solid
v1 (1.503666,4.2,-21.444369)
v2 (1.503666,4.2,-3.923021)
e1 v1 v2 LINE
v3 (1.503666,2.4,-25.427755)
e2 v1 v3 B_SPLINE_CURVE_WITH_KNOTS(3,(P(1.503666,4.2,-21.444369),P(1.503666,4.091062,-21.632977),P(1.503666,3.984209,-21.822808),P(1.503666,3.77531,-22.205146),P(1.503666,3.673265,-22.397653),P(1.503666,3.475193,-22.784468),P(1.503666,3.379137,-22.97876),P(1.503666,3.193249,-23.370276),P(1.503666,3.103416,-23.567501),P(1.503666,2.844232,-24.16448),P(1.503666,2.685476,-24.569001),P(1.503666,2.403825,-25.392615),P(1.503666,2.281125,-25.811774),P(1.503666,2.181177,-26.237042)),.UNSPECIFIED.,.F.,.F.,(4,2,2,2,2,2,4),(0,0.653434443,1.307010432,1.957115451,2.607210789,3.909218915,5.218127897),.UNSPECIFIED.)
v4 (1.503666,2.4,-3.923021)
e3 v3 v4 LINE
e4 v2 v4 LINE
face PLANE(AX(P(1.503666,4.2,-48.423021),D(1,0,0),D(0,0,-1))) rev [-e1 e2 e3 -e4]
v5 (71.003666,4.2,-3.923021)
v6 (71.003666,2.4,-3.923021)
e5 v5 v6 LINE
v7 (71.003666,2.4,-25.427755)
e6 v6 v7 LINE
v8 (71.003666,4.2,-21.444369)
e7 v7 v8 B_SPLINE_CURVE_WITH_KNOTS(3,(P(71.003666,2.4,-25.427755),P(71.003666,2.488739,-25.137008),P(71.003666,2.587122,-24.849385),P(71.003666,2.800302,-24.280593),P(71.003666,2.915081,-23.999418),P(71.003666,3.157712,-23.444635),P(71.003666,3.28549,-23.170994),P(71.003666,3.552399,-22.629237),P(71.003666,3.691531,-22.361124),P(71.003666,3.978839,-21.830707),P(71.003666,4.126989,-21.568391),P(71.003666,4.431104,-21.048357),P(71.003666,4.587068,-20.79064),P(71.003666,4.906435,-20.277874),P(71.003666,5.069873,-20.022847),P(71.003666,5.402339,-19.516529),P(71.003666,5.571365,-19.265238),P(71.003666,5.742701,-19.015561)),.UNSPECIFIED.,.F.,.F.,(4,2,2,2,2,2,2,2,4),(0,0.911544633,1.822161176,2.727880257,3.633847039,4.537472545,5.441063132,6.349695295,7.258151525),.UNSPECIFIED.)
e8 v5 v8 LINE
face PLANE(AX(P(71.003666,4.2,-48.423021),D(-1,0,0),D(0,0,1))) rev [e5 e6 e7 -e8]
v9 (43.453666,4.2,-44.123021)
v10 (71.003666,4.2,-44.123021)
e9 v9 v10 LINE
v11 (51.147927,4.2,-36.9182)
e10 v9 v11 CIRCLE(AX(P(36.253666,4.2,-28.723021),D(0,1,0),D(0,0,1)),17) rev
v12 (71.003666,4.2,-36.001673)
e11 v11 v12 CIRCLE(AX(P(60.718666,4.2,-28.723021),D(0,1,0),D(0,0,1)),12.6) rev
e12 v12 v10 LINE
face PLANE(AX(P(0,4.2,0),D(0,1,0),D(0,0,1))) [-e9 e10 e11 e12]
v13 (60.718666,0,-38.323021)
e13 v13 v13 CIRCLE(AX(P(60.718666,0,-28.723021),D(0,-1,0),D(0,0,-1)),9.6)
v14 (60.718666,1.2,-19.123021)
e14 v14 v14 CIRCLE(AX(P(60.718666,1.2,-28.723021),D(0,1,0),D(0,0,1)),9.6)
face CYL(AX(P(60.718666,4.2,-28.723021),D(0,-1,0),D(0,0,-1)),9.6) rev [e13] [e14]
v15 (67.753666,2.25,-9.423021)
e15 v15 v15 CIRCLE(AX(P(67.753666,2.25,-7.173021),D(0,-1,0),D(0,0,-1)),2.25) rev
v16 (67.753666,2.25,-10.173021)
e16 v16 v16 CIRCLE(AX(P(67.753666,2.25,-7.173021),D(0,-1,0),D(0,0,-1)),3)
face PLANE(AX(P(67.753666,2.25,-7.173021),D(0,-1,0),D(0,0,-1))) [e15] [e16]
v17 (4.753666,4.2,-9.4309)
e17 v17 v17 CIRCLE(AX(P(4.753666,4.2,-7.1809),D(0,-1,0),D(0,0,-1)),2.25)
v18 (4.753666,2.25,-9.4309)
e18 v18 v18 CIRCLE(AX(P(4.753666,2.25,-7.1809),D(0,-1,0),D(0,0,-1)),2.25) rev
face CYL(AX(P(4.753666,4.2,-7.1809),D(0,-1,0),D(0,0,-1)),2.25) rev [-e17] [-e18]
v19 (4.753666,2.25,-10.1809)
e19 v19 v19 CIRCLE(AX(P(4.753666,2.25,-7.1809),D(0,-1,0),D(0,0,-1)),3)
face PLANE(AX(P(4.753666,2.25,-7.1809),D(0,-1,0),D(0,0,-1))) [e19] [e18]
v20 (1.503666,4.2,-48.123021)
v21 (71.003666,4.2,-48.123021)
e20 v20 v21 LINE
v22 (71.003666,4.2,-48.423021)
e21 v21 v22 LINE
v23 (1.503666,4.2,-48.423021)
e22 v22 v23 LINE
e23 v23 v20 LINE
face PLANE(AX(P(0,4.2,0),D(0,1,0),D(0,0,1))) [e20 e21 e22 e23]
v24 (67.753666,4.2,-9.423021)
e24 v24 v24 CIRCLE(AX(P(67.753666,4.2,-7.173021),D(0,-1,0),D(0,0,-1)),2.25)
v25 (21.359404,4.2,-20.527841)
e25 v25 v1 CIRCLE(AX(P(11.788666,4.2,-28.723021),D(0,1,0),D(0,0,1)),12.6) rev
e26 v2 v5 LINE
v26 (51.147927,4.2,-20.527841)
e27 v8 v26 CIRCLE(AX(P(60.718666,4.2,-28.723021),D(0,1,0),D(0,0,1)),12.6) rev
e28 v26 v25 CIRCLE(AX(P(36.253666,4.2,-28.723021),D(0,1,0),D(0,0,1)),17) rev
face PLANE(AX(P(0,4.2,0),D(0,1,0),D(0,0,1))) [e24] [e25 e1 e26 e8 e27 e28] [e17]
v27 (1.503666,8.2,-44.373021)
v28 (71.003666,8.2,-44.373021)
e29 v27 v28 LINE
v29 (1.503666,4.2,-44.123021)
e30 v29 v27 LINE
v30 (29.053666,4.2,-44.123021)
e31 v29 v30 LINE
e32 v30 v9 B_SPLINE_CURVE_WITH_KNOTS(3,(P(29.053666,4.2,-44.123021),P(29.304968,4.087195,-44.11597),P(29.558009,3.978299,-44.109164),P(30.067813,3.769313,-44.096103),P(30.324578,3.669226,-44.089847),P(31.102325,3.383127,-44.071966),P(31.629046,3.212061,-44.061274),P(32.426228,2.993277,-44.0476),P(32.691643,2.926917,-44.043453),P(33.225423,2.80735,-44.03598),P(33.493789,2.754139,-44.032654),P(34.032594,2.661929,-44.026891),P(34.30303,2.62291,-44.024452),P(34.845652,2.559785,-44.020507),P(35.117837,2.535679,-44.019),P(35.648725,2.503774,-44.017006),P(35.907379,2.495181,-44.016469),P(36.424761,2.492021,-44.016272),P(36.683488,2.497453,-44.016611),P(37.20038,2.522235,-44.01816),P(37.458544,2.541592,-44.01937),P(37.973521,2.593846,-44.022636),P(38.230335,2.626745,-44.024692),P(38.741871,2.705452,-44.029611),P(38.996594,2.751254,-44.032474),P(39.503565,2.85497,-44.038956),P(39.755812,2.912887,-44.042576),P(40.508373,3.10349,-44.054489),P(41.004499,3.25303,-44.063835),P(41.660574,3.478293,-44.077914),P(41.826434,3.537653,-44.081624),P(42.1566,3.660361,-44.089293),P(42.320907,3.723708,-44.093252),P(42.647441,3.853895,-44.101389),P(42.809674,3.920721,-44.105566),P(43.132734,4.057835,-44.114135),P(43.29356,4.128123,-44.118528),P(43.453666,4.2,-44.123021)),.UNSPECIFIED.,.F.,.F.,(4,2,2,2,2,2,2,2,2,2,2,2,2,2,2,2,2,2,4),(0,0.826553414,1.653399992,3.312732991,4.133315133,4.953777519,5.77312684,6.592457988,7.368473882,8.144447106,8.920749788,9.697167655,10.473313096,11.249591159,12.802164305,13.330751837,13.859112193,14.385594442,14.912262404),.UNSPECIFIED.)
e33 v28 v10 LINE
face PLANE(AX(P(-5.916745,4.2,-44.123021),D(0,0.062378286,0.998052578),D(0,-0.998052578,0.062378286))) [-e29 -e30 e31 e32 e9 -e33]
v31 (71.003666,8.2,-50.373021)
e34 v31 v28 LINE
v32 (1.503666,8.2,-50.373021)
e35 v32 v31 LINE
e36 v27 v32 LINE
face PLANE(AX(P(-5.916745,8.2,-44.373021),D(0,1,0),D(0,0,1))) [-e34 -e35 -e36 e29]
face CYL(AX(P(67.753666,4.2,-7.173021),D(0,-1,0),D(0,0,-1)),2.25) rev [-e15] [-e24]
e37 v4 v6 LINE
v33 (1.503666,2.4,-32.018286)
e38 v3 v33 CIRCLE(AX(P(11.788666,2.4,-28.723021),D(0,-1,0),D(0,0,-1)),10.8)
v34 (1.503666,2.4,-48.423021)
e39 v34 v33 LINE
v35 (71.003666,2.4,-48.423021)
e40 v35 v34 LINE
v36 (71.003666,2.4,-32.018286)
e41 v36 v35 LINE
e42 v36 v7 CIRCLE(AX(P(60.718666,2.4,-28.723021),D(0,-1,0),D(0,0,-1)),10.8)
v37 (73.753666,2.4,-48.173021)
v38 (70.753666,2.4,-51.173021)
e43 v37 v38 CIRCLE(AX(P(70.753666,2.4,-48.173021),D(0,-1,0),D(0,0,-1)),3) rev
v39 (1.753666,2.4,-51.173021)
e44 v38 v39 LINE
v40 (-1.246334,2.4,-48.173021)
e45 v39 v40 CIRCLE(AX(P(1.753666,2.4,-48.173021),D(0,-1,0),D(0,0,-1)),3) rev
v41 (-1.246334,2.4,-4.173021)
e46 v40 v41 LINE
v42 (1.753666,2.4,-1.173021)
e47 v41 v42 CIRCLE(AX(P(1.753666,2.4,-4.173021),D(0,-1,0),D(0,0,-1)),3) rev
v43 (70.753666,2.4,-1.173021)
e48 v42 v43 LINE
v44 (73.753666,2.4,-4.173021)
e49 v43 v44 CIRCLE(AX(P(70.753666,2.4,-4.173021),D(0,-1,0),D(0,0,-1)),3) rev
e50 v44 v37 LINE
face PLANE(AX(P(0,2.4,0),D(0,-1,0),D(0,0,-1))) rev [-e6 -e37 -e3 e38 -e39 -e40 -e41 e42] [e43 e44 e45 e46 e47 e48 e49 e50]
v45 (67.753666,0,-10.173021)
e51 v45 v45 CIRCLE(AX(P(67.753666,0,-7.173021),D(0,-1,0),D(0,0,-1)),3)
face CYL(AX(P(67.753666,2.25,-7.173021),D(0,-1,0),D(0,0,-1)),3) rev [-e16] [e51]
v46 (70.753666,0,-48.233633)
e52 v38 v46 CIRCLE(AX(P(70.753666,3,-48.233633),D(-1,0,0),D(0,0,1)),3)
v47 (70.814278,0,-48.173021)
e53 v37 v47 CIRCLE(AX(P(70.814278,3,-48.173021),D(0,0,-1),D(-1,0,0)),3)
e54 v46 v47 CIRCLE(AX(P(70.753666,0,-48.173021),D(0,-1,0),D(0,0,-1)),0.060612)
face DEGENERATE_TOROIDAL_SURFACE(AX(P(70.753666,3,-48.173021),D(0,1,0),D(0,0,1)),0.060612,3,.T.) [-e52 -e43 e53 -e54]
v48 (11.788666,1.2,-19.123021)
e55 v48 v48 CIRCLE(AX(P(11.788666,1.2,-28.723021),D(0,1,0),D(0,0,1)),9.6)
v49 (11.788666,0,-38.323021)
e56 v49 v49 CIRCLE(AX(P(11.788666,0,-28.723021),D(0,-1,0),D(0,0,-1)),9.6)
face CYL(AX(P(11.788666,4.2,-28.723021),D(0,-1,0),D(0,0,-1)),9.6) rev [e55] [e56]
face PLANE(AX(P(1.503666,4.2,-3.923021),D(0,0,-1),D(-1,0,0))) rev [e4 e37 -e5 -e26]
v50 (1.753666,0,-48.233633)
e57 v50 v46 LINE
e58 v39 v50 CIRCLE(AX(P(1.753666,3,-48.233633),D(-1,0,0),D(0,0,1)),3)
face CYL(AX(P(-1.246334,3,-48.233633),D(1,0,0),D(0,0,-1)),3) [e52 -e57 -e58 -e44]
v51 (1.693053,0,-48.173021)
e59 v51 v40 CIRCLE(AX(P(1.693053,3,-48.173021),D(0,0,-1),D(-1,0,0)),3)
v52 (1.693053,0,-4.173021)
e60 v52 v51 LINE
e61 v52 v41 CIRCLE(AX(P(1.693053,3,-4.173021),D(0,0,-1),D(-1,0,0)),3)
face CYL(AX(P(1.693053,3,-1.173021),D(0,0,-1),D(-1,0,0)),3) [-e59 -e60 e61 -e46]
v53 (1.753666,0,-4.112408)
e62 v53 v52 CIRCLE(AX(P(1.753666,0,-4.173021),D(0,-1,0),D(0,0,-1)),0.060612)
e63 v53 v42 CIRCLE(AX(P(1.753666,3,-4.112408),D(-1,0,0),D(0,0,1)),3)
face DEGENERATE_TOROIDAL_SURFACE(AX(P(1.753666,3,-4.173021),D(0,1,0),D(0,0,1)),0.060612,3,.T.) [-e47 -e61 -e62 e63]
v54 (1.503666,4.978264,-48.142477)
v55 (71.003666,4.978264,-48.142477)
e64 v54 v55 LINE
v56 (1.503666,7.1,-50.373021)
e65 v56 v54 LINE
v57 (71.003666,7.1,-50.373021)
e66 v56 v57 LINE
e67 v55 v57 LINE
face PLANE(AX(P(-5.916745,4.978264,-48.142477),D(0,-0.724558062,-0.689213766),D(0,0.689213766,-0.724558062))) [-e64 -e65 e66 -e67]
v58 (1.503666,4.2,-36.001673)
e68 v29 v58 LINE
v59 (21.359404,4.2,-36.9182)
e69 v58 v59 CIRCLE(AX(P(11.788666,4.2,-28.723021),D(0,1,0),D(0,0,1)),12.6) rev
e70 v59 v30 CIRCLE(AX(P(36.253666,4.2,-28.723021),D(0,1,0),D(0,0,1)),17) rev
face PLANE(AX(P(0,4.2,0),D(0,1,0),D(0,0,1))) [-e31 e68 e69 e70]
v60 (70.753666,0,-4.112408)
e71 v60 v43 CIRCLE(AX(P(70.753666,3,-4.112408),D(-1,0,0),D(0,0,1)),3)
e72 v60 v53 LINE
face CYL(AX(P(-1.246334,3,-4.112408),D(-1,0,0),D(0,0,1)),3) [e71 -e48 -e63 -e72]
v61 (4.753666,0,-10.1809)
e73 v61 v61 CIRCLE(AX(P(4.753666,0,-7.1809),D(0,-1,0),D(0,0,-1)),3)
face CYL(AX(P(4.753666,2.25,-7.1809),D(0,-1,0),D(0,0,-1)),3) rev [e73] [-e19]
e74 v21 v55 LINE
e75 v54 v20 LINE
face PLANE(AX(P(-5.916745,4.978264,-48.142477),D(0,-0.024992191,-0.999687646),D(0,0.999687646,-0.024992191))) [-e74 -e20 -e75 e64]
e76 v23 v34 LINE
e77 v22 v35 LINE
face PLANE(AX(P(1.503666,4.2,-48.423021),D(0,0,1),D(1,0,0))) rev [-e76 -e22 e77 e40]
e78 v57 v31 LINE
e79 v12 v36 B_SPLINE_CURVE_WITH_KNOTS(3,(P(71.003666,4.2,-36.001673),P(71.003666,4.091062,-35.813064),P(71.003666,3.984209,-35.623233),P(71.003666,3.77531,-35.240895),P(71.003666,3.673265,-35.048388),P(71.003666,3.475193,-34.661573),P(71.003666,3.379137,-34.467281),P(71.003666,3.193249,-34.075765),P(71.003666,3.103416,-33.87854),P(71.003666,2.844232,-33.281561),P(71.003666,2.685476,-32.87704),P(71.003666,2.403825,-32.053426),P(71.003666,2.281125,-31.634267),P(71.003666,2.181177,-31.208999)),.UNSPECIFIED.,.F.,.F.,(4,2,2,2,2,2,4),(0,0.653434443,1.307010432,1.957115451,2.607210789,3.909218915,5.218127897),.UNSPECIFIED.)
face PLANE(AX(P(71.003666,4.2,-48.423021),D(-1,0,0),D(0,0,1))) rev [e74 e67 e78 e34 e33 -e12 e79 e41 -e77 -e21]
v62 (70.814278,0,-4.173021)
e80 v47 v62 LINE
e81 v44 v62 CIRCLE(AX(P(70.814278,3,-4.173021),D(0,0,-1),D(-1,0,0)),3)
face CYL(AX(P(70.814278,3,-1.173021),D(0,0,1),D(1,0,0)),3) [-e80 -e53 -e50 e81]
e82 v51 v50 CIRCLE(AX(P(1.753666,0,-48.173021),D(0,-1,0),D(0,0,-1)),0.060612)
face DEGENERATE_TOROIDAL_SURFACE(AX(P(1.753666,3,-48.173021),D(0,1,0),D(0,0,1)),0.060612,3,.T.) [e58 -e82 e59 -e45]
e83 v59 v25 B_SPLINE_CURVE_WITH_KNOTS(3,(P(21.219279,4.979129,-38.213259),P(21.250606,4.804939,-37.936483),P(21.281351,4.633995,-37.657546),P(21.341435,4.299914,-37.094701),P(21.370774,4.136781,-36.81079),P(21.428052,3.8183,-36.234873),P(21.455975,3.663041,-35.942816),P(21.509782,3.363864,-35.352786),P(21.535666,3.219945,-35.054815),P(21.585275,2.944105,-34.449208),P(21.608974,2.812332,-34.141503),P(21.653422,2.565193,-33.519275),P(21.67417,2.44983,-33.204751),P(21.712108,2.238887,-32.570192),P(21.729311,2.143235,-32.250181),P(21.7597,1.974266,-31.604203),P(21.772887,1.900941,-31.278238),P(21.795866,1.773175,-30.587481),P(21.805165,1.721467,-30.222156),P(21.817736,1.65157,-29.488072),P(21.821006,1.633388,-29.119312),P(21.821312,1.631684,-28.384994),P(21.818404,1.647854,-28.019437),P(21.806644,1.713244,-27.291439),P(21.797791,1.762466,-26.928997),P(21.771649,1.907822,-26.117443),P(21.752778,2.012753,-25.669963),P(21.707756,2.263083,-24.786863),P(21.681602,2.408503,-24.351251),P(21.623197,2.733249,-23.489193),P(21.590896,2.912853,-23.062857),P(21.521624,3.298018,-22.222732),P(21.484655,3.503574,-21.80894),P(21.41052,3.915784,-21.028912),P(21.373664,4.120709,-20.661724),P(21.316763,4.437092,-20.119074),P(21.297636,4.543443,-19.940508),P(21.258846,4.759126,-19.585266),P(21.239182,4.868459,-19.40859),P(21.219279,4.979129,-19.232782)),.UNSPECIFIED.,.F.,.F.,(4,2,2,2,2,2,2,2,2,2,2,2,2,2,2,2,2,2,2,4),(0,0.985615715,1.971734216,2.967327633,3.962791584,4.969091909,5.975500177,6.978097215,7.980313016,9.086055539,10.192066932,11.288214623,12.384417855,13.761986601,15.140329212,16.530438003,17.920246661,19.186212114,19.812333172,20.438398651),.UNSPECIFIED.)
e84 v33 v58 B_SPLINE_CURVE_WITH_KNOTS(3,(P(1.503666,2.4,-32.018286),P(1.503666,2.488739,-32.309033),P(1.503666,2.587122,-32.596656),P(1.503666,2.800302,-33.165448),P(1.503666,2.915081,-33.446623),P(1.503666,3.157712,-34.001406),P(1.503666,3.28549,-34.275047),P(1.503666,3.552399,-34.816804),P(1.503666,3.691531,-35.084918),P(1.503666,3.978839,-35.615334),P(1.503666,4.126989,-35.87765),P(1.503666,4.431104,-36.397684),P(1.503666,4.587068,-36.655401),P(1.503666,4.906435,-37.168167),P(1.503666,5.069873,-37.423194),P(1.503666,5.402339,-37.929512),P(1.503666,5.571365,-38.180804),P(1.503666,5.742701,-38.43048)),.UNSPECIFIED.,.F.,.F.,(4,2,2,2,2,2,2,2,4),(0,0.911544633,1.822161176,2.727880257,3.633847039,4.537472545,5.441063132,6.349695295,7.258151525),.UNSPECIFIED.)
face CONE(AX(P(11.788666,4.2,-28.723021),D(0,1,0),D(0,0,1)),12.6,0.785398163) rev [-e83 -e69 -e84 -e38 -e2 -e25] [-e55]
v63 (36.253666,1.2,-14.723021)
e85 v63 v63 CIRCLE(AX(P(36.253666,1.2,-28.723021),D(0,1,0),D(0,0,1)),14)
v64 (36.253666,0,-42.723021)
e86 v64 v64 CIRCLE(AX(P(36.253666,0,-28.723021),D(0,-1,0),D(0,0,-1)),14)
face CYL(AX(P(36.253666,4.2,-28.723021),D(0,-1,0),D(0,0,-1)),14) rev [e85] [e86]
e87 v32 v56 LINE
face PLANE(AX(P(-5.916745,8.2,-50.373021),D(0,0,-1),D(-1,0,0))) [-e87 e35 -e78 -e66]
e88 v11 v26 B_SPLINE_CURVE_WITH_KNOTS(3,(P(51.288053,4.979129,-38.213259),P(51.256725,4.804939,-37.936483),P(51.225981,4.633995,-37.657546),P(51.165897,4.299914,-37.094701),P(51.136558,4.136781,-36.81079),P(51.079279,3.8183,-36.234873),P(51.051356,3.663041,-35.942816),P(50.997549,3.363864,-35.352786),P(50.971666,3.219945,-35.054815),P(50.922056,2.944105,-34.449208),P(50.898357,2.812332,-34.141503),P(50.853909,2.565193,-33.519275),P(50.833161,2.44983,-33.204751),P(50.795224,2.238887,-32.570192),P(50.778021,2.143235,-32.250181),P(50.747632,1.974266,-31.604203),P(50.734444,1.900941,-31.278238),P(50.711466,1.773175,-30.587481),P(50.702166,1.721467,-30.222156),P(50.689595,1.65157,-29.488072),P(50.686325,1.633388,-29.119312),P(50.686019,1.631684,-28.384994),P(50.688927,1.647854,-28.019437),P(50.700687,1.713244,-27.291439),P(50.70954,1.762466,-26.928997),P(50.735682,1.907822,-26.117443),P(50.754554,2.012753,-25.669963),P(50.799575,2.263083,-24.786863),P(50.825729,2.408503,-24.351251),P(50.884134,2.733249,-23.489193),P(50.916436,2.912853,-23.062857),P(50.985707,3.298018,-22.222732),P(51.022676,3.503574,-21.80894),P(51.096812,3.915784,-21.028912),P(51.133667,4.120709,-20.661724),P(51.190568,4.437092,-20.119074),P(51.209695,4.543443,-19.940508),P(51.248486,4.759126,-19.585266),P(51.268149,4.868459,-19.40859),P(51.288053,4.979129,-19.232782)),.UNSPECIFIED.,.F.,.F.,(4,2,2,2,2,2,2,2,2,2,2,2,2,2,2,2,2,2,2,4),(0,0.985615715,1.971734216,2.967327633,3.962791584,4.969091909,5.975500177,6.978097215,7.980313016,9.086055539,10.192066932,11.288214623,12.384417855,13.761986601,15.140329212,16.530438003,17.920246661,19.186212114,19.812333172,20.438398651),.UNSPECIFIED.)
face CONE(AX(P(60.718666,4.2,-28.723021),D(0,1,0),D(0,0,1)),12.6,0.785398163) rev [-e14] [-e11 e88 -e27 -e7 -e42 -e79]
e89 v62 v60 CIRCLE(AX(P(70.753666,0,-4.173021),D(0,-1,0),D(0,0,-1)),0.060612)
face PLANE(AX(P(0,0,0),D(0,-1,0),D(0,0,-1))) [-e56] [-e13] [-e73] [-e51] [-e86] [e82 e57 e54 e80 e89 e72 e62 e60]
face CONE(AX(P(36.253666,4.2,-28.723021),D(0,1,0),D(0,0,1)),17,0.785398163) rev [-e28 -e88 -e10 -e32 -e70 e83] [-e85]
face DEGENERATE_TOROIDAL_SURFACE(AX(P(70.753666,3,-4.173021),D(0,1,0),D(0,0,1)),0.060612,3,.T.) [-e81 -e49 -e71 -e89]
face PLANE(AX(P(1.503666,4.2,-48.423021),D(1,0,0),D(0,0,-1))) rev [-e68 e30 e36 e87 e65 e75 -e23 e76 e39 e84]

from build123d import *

# Parameters (mm, degrees)
SKETCH1_W           = 75
SKETCH1_H           = 50
BOSS_EXTRUDE1_DEPTH = 2.4
SKETCH2_W           = 69.5
SKETCH2_H           = 44.5
BOSS_EXTRUDE2_DEPTH = 1.8
SKETCH4_R           = 9.6
SKETCH4_R_2         = 14
SKETCH4_R_3         = 2.25
CUT_EXTRUDE1_DEPTH  = 90.866129507
BOSS_EXTRUDE3_DEPTH = 69.5
FILLET1_R           = 3
FILLET2_R           = 3
SKETCH7_R           = 3
CUT_EXTRUDE3_DEPTH  = 2.25
CHAMFER1_SIZE       = 3


with BuildPart() as part:
    # Sketch1 → Boss-Extrude1 (new body)
    with BuildSketch(Plane(origin=(0, 0, 0), x_dir=(1, 0, 0), z_dir=(0, 1, 0))):
        with Locations((36.253665689, 26.173020528)):
            Rectangle(SKETCH1_W, SKETCH1_H)
    extrude(amount=BOSS_EXTRUDE1_DEPTH)

    # Sketch2 → Boss-Extrude2 (add)
    with BuildSketch(Plane(origin=(0, 2.4, 0), x_dir=(1, 0, 0), z_dir=(0, 1, 0))):
        with Locations((36.253665689, 26.173020528)):
            Rectangle(SKETCH2_W, SKETCH2_H)
    extrude(amount=BOSS_EXTRUDE2_DEPTH)

    # Sketch4 → Cut-Extrude1 (cut, through all)
    with BuildSketch(Plane(origin=(0, 0, 0), x_dir=(-1, 0, 0), z_dir=(0, -1, 0))):
        with Locations(Location((-60.718665689, 28.723020528, 0), (0, 0, 90))):
            Circle(SKETCH4_R)
        with Locations(Location((-36.253665689, 28.723020528, 0), (0, 0, 90))):
            Circle(SKETCH4_R_2)
        with Locations(Location((-11.788665689, 28.723020528, 0), (0, 0, 90))):
            Circle(SKETCH4_R)
        with Locations(Location((-67.753665689, 7.173020528, 0), (0, 0, 90))):
            Circle(SKETCH4_R_3)
        with Locations(Location((-4.753665689, 7.180899965, 0), (0, 0, 90))):
            Circle(SKETCH4_R_3)
    extrude(amount=-CUT_EXTRUDE1_DEPTH, mode=Mode.SUBTRACT)

    # Sketch5 → Boss-Extrude3 (add)
    with BuildSketch(Plane(origin=(71.003665689, 0, 0), x_dir=(0, 0, -1), z_dir=(1, 0, 0))):
        Polygon((48.123020528, 4.2), (44.123020528, 4.2), (44.373020528, 8.2), (50.373020528, 8.2), (50.373020528, 7.1), (48.142477117, 4.978263585), align=None)
    extrude(amount=-BOSS_EXTRUDE3_DEPTH)

    # Fillet1
    fillet1_edges = [part.edges().sort_by_distance(p)[0] for p in [
        (-1.246334311, 1.2, -51.173020528),
        (73.753665689, 1.2, -51.173020528),
        (73.753665689, 1.2, -1.173020528),
        (-1.246334311, 1.2, -1.173020528),
    ]]
    fillet(fillet1_edges, radius=FILLET1_R)

    # Fillet2
    # the kernel refuses this fillet: 3 mm, written as the material it takes off along each edge
    with BuildSketch(Plane(origin=(1.753665689, 0, -48.173020528), x_dir=(-1, 0, 0), z_dir=(0, 0, 1))) as fillet2_piece_1:
        with BuildLine():
            CenterArc((0.060612309, -3), FILLET2_R, 11.536959033, 78.463040967)
            Line((3, -2.4), (3.058787754, -2.388))
            ThreePointArc((3.058787754, -2.388), (3.06, -1.2), (3.06, 0))
            Line((3.06, 0), (3, 0.06))
            Line((3, 0.06), (0.060612309, 0.06))
            Line((0.060612309, 0.06), (0.060612309, 0))
        make_face()
    revolve(axis=Axis((1.753665689, 0, -48.173020528), (0, -1, 0)), revolution_arc=90, mode=Mode.SUBTRACT)
    with BuildSketch(Plane(origin=(70.753665689, 0, -51.173020528), x_dir=(0, 0, 1), z_dir=(-1, 0, 0))) as fillet2_piece_2:
        with BuildLine():
            CenterArc((2.939387691, 3), FILLET2_R, 191.536959033, 78.463040967)
            Line((0, 2.4), (-0.058787754, 2.388))
            ThreePointArc((-0.058787754, 2.388), (-0.06, 1.2), (-0.06, 0))
            Line((-0.06, 0), (0, -0.06))
            Line((0, -0.06), (2.939387691, -0.06))
            Line((2.939387691, -0.06), (2.939387691, 0))
        make_face()
    extrude(amount=69, mode=Mode.SUBTRACT)
    with BuildSketch(Plane(origin=(70.753665689, 0, -48.173020528), x_dir=(1, 0, 0), z_dir=(0, 0, 1))) as fillet2_piece_3:
        with BuildLine():
            CenterArc((0.060612309, 3), FILLET2_R, 270, 78.463040967)
            Line((3, 2.4), (3.058787754, 2.388))
            ThreePointArc((3.058787754, 2.388), (3.06, 1.2), (3.06, 0))
            Line((3.06, 0), (3, -0.06))
            Line((3, -0.06), (0.060612309, -0.06))
            Line((0.060612309, -0.06), (0.060612309, 0))
        make_face()
    revolve(axis=Axis((70.753665689, 0, -48.173020528), (0, 1, 0)), revolution_arc=90, mode=Mode.SUBTRACT)
    with BuildSketch(Plane(origin=(73.753665689, 0, -4.173020528), x_dir=(-1, 0, 0), z_dir=(0, 0, -1)), Plane(origin=(-1.246334311, 0, -48.173020528), x_dir=(1, 0, 0), z_dir=(0, 0, 1))) as fillet2_piece_4:
        with BuildLine():
            CenterArc((2.939387691, 3), FILLET2_R, 191.536959033, 78.463040967)
            Line((0, 2.4), (-0.058787754, 2.388))
            ThreePointArc((-0.058787754, 2.388), (-0.06, 1.2), (-0.06, 0))
            Line((-0.06, 0), (0, -0.06))
            Line((0, -0.06), (2.939387691, -0.06))
            Line((2.939387691, -0.06), (2.939387691, 0))
        make_face()
    extrude(amount=44, mode=Mode.SUBTRACT)
    with BuildSketch(Plane(origin=(70.753665689, 0, -4.173020528), x_dir=(0, 0, 1), z_dir=(-1, 0, 0))) as fillet2_piece_5:
        with BuildLine():
            CenterArc((0.060612309, 3), FILLET2_R, 270, 78.463040967)
            Line((3, 2.4), (3.058787754, 2.388))
            ThreePointArc((3.058787754, 2.388), (3.06, 1.2), (3.06, 0))
            Line((3.06, 0), (3, -0.06))
            Line((3, -0.06), (0.060612309, -0.06))
            Line((0.060612309, -0.06), (0.060612309, 0))
        make_face()
    revolve(axis=Axis((70.753665689, 0, -4.173020528), (0, 1, 0)), revolution_arc=90, mode=Mode.SUBTRACT)
    with BuildSketch(Plane(origin=(1.753665689, 0, -1.173020528), x_dir=(0, 1.0, -1.5658770576478976e-12), z_dir=(1, 0, 0))) as fillet2_piece_6:
        with BuildLine():
            CenterArc((3, -2.939387691), FILLET2_R, 101.536959033, 78.463040967)
            Line((0, -2.939387691), (-0.06, -2.939387691))
            Line((-0.06, -2.939387691), (-0.06, 0))
            Line((-0.06, 0), (0, 0.06))
            ThreePointArc((0, 0.06), (1.2, 0.06), (2.388, 0.058787754))
            Line((2.388, 0.058787754), (2.4, 0))
        make_face()
    extrude(amount=69, mode=Mode.SUBTRACT)
    with BuildSketch(Plane(origin=(1.753665689, 0, -4.173020528), x_dir=(0, 0, 1), z_dir=(1, 0, 0))) as fillet2_piece_7:
        with BuildLine():
            CenterArc((0.060612309, -3), FILLET2_R, 11.536959033, 78.463040967)
            Line((3, -2.4), (3.058787754, -2.388))
            ThreePointArc((3.058787754, -2.388), (3.06, -1.2), (3.06, 0))
            Line((3.06, 0), (3, 0.06))
            Line((3, 0.06), (0.060612309, 0.06))
            Line((0.060612309, 0.06), (0.060612309, 0))
        make_face()
    revolve(axis=Axis((1.753665689, 0, -4.173020528), (0, -1, 0)), revolution_arc=90, mode=Mode.SUBTRACT)

    # Sketch7 → Cut-Extrude3 (cut)
    with BuildSketch(Plane.XZ):
        with Locations(Location((4.753665689, -7.180899965, 0), (0, 0, 270))):
            Circle(SKETCH7_R)
        with Locations(Location((67.753665689, -7.173020528, 0), (0, 0, 270))):
            Circle(SKETCH7_R)
    extrude(amount=-CUT_EXTRUDE3_DEPTH, mode=Mode.SUBTRACT)

    # Chamfer1
    # the kernel refuses this chamfer: 3 mm, written as the material it takes off along each edge
    with BuildSketch(Plane(origin=(11.788665689, 4.2, -28.723020528), x_dir=(0, 0, -1), z_dir=(-1, 0, 0))) as chamfer1_piece_1:
        Polygon((9.6 + CHAMFER1_SIZE, 0), (9.6, CHAMFER1_SIZE), (9.6, 0), align=None)
    revolve(axis=Axis((11.788665689, 4.2, -28.723020528), (0, -1, 0)), mode=Mode.SUBTRACT)
    with BuildSketch(Plane(origin=(36.253665689, 4.2, -28.723020528), x_dir=(0, 0, -1), z_dir=(-1, 0, 0))) as chamfer1_piece_2_section:
        Polygon((14 + CHAMFER1_SIZE, 0), (14, CHAMFER1_SIZE), (14, 0), align=None)
    chamfer1_piece_2 = revolve(axis=Axis((36.253665689, 4.2, -28.723020528), (0, -1, 0)), mode=Mode.PRIVATE)
    chamfer1_piece_2 = split(chamfer1_piece_2, bisect_by=Plane(origin=(36.253665689, 0.839630842, -43.912997455), z_dir=(0, 0.06237828615517877, 0.9980525784828888)), keep=Keep.TOP, mode=Mode.PRIVATE)
    add(chamfer1_piece_2, mode=Mode.SUBTRACT)
    with BuildSketch(Plane(origin=(60.718665689, 4.2, -28.723020528), x_dir=(0, 0, -1), z_dir=(-1, 0, 0))) as chamfer1_piece_3:
        Polygon((9.6 + CHAMFER1_SIZE, 0), (9.6, CHAMFER1_SIZE), (9.6, 0), align=None)
    revolve(axis=Axis((60.718665689, 4.2, -28.723020528), (0, -1, 0)), mode=Mode.SUBTRACT)


solid = part.part
